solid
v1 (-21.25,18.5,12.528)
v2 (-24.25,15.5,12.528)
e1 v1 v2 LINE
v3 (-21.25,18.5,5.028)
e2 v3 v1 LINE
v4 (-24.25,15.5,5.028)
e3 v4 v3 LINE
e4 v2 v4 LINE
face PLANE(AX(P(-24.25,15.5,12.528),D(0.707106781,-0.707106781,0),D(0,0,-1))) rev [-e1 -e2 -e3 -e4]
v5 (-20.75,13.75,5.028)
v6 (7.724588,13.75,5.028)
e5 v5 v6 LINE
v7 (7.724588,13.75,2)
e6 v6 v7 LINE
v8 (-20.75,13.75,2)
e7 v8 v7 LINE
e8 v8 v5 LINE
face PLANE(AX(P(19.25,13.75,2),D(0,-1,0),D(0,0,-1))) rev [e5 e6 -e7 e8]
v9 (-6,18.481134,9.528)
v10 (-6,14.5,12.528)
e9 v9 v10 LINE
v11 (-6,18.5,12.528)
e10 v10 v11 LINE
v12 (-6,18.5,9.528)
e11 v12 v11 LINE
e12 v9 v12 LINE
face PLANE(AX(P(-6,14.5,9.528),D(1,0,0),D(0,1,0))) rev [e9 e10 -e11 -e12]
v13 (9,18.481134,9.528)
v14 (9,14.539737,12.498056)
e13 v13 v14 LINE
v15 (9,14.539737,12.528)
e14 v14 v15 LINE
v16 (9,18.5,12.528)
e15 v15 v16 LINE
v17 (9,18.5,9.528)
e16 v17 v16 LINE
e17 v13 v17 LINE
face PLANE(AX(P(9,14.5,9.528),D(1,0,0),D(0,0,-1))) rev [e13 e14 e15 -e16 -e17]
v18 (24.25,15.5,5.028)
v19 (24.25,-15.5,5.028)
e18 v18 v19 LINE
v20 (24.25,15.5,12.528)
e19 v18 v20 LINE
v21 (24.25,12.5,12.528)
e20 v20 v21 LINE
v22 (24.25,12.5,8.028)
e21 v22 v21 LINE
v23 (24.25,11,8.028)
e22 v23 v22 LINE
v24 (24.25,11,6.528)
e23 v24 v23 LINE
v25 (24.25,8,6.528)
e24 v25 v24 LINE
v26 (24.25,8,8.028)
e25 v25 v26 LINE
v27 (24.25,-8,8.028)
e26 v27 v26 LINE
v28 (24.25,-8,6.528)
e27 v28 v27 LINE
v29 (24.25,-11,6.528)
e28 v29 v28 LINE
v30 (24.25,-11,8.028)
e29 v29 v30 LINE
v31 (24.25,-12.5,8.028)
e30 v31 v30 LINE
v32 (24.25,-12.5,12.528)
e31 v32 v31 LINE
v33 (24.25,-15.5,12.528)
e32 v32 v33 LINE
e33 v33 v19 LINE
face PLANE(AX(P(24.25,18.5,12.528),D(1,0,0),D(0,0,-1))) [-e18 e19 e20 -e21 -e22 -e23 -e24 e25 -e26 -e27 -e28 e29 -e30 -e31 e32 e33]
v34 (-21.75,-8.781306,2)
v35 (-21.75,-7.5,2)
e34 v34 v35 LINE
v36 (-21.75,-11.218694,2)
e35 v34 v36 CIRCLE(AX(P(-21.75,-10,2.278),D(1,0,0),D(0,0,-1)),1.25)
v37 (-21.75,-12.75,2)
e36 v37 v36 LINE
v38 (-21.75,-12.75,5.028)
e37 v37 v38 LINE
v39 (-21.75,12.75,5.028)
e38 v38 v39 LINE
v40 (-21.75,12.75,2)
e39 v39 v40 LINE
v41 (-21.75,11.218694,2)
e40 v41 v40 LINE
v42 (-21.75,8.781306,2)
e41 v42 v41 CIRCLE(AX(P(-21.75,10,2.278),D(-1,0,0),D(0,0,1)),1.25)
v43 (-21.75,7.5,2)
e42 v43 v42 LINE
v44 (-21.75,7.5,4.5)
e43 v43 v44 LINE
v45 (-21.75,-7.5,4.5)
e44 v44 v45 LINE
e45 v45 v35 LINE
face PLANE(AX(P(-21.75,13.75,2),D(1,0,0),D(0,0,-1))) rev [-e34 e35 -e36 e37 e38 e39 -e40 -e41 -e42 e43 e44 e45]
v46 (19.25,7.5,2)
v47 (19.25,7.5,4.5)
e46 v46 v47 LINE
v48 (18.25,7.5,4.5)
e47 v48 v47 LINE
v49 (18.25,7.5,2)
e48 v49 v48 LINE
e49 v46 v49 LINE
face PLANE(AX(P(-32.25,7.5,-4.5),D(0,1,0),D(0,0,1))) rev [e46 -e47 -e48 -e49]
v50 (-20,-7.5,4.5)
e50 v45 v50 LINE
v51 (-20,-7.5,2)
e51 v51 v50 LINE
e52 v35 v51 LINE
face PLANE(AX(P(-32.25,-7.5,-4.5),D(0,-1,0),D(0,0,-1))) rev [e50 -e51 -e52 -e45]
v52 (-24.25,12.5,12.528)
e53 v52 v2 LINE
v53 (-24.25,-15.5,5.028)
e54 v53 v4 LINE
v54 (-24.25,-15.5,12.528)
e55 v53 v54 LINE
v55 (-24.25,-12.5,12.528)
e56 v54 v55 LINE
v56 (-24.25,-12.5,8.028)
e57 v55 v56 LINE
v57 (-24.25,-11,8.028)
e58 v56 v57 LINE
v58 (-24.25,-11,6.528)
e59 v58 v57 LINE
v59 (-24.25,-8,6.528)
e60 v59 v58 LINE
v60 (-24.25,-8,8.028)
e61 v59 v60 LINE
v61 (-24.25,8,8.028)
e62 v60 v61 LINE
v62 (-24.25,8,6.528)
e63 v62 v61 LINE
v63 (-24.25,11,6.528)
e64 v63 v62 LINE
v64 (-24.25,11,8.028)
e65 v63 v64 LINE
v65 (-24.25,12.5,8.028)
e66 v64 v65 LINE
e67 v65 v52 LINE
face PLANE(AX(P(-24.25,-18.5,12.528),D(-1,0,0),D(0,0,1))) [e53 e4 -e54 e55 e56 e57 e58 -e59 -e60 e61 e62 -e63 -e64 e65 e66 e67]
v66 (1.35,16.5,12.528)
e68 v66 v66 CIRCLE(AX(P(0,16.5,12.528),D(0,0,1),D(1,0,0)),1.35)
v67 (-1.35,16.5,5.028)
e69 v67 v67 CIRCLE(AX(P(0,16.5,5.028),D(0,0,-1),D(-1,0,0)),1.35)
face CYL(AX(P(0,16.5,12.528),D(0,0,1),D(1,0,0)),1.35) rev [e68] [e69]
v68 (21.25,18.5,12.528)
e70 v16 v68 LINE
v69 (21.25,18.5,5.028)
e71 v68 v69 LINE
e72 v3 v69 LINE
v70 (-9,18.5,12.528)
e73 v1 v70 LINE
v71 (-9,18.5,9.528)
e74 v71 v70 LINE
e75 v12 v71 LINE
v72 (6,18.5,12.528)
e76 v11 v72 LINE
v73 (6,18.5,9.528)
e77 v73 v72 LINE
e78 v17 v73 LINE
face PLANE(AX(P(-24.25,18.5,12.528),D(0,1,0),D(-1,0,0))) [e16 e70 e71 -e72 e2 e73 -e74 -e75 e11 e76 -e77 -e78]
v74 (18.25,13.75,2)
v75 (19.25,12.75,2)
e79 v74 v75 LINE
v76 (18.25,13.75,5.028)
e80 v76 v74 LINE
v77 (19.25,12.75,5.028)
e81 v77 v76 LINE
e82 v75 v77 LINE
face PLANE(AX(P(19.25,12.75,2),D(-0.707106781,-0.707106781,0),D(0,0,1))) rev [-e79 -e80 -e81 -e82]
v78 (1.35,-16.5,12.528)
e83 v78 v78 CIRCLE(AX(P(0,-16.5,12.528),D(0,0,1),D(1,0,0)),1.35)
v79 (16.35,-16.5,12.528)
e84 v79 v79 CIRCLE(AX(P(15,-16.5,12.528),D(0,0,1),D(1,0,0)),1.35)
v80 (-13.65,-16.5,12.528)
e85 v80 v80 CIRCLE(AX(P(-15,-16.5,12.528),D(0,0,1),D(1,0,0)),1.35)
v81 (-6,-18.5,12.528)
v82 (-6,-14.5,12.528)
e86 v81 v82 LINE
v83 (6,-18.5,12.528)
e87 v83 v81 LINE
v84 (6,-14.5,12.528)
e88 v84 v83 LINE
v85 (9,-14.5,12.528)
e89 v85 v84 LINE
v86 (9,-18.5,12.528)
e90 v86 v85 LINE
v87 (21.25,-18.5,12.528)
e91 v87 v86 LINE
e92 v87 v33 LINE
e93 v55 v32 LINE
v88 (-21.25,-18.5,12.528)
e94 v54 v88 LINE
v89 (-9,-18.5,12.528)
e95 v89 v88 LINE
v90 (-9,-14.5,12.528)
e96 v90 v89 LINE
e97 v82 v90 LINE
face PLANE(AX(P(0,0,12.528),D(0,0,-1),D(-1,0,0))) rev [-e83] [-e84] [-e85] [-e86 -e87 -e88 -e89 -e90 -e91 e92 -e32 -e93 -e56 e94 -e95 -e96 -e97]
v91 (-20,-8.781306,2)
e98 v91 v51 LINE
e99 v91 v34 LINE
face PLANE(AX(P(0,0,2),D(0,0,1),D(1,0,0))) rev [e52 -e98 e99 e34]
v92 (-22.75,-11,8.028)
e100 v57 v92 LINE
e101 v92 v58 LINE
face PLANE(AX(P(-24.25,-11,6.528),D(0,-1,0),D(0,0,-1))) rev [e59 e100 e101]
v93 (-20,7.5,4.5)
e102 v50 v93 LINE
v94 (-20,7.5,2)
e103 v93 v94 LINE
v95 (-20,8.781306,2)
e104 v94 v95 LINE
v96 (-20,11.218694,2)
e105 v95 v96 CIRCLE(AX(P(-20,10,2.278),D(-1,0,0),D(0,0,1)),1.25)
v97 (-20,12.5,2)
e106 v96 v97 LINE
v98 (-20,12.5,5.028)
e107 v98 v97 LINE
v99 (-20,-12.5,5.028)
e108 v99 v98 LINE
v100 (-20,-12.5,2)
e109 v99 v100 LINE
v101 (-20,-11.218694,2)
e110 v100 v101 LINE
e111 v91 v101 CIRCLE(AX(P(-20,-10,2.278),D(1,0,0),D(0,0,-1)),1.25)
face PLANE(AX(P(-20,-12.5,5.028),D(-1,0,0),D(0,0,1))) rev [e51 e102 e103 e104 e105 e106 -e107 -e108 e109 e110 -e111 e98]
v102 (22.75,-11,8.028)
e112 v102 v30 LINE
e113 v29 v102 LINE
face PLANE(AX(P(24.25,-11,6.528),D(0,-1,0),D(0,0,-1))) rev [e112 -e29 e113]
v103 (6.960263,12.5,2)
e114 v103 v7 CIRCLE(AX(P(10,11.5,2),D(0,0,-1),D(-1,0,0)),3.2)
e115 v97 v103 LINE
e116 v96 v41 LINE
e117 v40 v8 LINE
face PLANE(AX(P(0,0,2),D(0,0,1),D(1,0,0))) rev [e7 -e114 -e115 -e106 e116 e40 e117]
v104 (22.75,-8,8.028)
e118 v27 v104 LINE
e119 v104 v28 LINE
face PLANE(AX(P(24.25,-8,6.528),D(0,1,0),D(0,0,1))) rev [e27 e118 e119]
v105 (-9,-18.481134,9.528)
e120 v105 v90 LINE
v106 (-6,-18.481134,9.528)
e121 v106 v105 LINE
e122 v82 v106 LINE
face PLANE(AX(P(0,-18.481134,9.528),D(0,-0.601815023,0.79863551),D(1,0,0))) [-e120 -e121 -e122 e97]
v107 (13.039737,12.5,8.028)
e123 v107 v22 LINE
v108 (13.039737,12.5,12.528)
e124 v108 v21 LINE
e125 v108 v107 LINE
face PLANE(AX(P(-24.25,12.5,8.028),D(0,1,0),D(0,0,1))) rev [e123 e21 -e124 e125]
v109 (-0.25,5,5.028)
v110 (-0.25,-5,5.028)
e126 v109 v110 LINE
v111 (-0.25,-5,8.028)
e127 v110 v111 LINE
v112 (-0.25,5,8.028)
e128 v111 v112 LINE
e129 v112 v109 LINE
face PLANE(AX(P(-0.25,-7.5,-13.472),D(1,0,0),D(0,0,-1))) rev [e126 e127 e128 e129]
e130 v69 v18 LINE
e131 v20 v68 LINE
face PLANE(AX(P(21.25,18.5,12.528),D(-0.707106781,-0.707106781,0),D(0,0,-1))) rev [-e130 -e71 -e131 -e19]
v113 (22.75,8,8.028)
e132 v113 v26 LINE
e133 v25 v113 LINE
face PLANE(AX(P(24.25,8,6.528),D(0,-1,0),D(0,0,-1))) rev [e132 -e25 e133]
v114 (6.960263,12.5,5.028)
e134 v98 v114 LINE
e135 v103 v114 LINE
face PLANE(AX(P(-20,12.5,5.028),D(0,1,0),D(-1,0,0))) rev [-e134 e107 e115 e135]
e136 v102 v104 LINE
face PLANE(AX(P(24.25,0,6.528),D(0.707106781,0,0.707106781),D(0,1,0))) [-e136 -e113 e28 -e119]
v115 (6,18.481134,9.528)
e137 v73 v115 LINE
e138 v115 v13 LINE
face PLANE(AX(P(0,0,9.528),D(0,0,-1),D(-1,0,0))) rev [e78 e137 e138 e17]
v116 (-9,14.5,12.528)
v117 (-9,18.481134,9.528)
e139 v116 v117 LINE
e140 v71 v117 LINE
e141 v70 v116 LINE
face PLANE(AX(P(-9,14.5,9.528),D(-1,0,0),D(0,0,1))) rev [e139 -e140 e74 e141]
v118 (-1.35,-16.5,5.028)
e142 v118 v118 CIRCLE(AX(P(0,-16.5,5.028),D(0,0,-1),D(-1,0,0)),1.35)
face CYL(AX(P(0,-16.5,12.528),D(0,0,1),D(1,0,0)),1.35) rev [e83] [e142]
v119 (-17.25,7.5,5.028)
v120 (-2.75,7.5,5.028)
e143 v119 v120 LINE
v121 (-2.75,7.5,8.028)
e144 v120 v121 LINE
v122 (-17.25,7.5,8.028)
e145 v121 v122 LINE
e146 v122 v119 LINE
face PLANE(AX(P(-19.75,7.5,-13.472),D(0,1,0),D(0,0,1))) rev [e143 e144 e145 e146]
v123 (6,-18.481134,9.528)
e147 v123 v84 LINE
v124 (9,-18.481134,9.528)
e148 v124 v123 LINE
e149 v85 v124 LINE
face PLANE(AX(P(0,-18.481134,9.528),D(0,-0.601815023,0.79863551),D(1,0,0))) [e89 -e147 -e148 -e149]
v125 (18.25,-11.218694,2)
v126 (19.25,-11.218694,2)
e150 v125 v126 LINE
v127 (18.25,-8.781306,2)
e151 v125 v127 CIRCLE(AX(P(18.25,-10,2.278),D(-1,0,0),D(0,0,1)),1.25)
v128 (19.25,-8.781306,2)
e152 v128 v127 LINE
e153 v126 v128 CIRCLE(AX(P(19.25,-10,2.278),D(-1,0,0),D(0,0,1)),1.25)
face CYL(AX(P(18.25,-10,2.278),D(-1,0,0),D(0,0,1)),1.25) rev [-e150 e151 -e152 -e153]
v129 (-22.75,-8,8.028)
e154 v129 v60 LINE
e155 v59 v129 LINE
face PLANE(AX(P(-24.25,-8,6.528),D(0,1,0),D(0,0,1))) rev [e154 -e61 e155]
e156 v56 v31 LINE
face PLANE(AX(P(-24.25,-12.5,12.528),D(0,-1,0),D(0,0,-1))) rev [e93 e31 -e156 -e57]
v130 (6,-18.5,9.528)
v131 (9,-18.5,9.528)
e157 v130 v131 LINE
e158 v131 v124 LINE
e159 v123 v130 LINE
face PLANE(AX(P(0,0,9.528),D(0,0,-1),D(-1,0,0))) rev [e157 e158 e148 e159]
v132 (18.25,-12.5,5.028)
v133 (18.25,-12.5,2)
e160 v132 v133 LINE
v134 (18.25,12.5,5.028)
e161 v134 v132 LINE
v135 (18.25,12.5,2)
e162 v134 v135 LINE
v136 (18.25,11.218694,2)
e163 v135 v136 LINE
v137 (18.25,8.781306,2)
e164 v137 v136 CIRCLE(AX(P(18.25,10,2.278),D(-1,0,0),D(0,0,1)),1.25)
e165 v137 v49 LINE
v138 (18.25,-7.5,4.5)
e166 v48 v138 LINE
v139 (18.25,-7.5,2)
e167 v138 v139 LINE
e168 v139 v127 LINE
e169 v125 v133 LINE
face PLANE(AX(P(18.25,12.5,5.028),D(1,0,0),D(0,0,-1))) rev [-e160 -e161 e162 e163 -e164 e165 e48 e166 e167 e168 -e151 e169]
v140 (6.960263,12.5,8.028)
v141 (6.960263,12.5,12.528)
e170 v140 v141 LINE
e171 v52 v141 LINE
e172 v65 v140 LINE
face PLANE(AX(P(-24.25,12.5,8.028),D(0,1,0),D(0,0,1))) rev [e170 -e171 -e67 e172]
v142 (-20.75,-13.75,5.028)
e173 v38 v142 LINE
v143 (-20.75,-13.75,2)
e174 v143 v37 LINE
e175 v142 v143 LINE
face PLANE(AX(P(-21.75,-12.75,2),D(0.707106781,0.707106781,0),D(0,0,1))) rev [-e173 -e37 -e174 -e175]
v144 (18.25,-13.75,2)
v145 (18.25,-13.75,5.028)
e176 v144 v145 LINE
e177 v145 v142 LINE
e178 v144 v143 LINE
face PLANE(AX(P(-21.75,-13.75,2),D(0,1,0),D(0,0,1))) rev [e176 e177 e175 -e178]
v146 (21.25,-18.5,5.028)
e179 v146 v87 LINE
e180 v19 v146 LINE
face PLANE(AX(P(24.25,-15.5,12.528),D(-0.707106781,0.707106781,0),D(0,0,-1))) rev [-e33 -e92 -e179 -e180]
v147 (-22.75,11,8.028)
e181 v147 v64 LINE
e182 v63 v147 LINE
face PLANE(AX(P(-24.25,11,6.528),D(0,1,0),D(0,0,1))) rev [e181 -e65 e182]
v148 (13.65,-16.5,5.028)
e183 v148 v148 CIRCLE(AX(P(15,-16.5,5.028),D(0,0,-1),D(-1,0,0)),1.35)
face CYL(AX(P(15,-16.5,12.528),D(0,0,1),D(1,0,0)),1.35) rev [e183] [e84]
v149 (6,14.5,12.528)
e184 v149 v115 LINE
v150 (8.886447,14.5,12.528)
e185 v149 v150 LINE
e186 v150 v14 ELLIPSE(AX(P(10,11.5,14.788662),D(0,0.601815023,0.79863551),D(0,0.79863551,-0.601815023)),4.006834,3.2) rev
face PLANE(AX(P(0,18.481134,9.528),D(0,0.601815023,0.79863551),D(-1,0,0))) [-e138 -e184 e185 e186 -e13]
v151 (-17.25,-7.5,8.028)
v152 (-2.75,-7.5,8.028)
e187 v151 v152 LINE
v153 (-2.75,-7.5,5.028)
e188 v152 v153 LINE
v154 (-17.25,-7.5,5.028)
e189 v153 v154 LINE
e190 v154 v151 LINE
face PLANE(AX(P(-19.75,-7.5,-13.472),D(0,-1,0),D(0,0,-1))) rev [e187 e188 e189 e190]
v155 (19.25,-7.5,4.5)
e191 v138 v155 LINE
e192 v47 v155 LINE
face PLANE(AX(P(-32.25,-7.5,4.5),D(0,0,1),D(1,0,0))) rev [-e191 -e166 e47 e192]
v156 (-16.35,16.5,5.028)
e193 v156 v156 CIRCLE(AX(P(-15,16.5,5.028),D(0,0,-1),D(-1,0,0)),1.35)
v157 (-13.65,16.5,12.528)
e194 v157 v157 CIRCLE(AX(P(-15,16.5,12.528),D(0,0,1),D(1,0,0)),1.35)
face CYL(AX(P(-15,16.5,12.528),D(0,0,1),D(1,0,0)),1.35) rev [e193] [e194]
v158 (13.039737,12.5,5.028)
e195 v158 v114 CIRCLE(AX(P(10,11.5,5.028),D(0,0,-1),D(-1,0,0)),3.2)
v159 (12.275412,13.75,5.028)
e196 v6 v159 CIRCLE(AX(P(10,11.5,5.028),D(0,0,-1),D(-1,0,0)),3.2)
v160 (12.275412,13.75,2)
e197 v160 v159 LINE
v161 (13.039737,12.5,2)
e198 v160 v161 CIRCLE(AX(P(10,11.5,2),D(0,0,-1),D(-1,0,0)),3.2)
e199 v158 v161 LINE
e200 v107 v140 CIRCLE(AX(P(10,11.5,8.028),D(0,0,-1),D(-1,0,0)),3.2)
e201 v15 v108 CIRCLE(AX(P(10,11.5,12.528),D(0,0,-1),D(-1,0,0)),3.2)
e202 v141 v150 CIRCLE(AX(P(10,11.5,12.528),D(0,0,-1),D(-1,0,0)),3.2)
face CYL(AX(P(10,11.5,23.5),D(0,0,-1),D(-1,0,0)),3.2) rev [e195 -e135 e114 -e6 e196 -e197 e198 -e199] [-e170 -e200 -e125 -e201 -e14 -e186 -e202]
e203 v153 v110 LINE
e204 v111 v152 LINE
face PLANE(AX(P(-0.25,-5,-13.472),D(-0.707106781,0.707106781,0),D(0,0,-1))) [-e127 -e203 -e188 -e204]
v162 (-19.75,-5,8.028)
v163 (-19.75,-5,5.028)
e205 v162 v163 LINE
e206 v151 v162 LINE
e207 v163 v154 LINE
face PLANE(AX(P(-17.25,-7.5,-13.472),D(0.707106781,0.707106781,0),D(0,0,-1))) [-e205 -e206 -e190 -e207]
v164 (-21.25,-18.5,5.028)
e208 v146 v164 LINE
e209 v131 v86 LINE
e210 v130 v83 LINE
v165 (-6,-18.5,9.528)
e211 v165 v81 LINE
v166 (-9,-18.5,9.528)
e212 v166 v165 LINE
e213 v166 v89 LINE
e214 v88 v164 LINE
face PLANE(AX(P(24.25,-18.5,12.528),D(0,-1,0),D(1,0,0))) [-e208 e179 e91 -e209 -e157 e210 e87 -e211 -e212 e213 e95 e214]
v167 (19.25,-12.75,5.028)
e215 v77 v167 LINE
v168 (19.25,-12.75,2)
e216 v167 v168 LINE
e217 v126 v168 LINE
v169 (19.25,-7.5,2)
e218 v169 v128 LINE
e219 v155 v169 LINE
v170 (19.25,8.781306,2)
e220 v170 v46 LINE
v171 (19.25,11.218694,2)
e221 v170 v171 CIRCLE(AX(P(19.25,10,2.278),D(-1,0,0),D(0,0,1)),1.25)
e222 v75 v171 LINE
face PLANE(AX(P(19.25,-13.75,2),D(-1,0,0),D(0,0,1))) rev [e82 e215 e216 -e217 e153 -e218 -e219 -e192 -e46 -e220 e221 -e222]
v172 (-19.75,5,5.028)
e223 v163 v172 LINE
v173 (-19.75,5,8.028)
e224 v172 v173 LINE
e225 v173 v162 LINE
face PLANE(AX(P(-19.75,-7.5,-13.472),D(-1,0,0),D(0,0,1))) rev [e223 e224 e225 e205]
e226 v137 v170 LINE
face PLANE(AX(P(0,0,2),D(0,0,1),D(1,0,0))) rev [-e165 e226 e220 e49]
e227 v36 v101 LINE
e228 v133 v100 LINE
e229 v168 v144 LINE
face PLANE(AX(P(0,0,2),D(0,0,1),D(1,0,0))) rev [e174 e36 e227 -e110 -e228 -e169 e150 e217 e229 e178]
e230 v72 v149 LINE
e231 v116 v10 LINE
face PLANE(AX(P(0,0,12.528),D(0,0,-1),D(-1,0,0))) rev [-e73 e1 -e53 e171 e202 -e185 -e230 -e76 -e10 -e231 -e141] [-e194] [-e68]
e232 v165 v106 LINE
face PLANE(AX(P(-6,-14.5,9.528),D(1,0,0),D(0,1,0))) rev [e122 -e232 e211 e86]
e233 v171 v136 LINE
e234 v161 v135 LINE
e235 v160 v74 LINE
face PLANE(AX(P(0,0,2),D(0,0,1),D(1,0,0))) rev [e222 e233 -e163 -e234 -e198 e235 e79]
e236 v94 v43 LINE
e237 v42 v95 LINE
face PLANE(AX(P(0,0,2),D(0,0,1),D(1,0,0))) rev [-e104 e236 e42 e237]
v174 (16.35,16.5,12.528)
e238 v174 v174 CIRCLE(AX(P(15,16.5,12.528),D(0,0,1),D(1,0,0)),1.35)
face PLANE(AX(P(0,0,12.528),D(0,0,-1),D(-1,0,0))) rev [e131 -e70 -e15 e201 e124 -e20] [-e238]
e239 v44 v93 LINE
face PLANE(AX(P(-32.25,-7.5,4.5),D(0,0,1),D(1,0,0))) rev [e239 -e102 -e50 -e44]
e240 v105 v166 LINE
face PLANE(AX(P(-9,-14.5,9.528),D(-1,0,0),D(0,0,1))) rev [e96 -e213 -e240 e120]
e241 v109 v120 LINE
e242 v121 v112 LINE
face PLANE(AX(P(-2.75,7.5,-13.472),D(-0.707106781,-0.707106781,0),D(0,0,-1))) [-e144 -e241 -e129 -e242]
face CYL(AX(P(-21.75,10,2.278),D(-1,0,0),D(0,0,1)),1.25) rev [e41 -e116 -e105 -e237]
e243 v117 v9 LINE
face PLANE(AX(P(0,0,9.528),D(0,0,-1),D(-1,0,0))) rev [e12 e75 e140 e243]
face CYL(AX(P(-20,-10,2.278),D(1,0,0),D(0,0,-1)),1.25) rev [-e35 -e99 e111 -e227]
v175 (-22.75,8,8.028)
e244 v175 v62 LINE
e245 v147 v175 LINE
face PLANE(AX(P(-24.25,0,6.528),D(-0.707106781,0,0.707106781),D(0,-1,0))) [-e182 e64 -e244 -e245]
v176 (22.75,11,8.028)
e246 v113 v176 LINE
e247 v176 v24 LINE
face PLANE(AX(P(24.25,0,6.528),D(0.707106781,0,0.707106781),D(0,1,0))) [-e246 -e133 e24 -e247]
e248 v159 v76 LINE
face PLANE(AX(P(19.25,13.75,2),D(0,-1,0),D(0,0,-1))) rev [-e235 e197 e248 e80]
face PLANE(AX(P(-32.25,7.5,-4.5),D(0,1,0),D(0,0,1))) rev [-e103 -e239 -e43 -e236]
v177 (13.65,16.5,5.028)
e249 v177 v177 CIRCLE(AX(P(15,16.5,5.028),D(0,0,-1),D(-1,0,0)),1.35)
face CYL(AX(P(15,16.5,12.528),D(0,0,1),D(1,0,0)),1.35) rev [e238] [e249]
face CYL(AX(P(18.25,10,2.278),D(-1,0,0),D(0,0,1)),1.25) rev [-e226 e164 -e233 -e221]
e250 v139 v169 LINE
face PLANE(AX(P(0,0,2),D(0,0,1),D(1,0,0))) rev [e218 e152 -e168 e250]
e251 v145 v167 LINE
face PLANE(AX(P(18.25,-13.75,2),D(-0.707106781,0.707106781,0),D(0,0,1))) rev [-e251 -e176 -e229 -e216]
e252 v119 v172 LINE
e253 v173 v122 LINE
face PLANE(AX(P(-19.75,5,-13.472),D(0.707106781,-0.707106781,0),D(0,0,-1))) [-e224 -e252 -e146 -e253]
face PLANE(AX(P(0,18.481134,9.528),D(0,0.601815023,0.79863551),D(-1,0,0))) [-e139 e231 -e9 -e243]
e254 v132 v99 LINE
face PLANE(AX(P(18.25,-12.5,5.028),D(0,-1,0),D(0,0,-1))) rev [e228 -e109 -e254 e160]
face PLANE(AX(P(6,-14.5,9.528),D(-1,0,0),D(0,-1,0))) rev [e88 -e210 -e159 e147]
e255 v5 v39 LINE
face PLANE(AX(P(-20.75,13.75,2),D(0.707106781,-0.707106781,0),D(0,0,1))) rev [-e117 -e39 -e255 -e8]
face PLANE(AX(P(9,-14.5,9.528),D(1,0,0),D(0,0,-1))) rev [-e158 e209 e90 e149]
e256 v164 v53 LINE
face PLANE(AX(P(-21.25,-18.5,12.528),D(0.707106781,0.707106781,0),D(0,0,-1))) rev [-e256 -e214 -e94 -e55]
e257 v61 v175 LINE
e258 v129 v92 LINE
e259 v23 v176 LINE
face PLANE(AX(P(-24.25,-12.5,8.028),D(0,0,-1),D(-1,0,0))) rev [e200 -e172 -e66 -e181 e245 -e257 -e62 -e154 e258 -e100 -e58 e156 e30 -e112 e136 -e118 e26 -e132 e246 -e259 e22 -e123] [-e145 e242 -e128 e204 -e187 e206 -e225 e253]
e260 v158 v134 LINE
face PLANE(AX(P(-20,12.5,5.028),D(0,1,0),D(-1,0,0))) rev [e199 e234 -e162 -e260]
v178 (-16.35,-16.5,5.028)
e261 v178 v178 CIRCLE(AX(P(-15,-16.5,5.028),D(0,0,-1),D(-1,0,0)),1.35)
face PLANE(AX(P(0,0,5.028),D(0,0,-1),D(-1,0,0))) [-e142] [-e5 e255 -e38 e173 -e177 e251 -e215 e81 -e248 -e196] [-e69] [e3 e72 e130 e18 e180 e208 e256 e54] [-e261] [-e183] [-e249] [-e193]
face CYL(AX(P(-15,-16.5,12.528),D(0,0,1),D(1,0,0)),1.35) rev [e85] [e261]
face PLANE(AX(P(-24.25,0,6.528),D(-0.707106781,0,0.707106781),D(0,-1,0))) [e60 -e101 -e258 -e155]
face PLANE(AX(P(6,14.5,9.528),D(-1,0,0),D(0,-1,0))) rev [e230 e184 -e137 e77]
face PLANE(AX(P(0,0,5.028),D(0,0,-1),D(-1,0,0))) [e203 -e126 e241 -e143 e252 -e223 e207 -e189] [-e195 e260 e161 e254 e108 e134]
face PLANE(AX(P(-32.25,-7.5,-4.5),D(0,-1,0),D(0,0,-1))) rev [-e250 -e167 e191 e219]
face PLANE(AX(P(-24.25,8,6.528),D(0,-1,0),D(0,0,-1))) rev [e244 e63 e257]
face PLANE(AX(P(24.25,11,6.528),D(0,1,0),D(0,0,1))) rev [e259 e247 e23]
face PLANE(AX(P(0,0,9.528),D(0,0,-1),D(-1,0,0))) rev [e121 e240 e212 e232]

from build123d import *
from OCP.BRepFilletAPI import BRepFilletAPI_MakeChamfer

# Parameters (mm, degrees)
SKETCH_1_W                  = 48.5
SKETCH_1_H                  = 37
EXTRUDE_1_DEPTH             = 7.5
SKETCH_2_W                  = 4.5
SKETCH_2_H                  = 25
CUT_EXTRUDE_1_DEPTH         = 54.398977368
SKETCH_3_W                  = 41
SKETCH_3_H                  = 27.5
EXTRUDE_2_DEPTH             = 3.028
SKETCH_4_W                  = 38.25
SKETCH_4_H                  = 25
CUT_EXTRUDE_2_DEPTH         = 3.028
CUT_EXTRUDE_3_DEPTH         = 49.015109955
CUT_EXTRUDE_4_DEPTH         = 52.139033859
CUT_EXTRUDE_5_DEPTH         = 32.090983966
HOLE_WIZARD_2_5_2_5_1_D     = 2.5
HOLE_WIZARD_2_5_2_5_1_DEPTH = 1.75
HOLE_WIZARD_2_5_2_5_2_D     = 2.5
HOLE_WIZARD_2_5_2_5_2_DEPTH = 6
HOLE_WIZARD_2_5_2_5_3_D     = 2.5
HOLE_WIZARD_2_5_2_5_3_DEPTH = 4.25
HOLE_WIZARD_2_7_2_7_1_D     = 2.7
CHAMFER_1_SIZE              = 3
SKETCH_17_W                 = 3
SKETCH_17_H                 = 4
CUT_EXTRUDE_8_DEPTH         = 3
CHAMFER_2_SIZE              = 3
CHAMFER_2_SIZE_2            = 3.981134465
SKETCH_19_W                 = 2
SKETCH_19_H                 = 3
CUT_EXTRUDE_9_DEPTH         = 1.5
CHAMFER_3_SIZE              = 2
CHAMFER_4_SIZE              = 1
SKETCH_20_R                 = 3.2
CUT_EXTRUDE_10_DEPTH        = 21.5
SKETCH_21_W                 = 19.5
SKETCH_21_H                 = 15
CUT_EXTRUDE_11_DEPTH        = 21.5
CHAMFER_5_SIZE              = 2.5
SKETCH_22_W                 = 9
SKETCH_22_H                 = 15
CUT_EXTRUDE_12_DEPTH        = 51.5


# Some blends are built 0.0001 mm under size
with BuildPart() as part:
    # 草图1 → 凸台-拉伸1 (new body)
    with BuildSketch(Plane(origin=(0, 0, 5.028), x_dir=(-1, 0, 0), z_dir=(0, 0, -1))):
        Rectangle(SKETCH_1_W, SKETCH_1_H)
    extrude(amount=-EXTRUDE_1_DEPTH)

    # 草图2 → 切除-拉伸1 (cut, through all)
    with BuildSketch(Plane(origin=(24.25, 0, 0), x_dir=(0, 0, -1), z_dir=(1, 0, 0))):
        with Locations((-10.278, 0)):
            Rectangle(SKETCH_2_W, SKETCH_2_H)
    extrude(amount=-CUT_EXTRUDE_1_DEPTH, mode=Mode.SUBTRACT)

    # 草图3 → 凸台-拉伸2 (add)
    with BuildSketch(Plane(origin=(0, 0, 5.028), x_dir=(-1, 0, 0), z_dir=(0, 0, -1))):
        with Locations((1.25, 0)):
            Rectangle(SKETCH_3_W, SKETCH_3_H)
    extrude(amount=EXTRUDE_2_DEPTH)

    # 草图4 → 切除-拉伸2 (cut)
    with BuildSketch(Plane(origin=(0, 0, 2), x_dir=(-1, 0, 0), z_dir=(0, 0, -1))):
        with Locations((0.875, 0)):
            Rectangle(SKETCH_4_W, SKETCH_4_H)
    extrude(amount=-CUT_EXTRUDE_2_DEPTH, mode=Mode.SUBTRACT)

    # 草图5 → 切除-拉伸3 (cut, through all)
    with BuildSketch(Plane.ZY.offset(-18.25)):
        with BuildLine():
            Line((2, 7.034395212), (2, -7.034395212))
            ThreePointArc((2, -7.034395212), (4.278, 0), (2, 7.034395212))
        make_face()
    extrude(amount=-CUT_EXTRUDE_3_DEPTH, mode=Mode.SUBTRACT)

    # 草图6 → 切除-拉伸4 (cut, through all)
    with BuildSketch(Plane.ZY.offset(21.75)):
        with BuildLine():
            Line((2, 7.034395212), (2, -7.034395212))
            ThreePointArc((2, -7.034395212), (4.278, 0), (2, 7.034395212))
        make_face()
    extrude(amount=-CUT_EXTRUDE_4_DEPTH, mode=Mode.SUBTRACT)

    # 草图7 → 切除-拉伸5 (cut, through all)
    with BuildSketch(Plane.XY.offset(8.028)):
        with BuildLine():
            Line((-7.978419869, 7.029222073), (-13.021580131, 7.029222073))
            ThreePointArc((-13.021580131, 7.029222073), (-17.801221513, 4.934335949), (-19.5, 0))
            ThreePointArc((-19.5, 0), (-17.801221513, -4.934335949), (-13.021580131, -7.029222073))
            Line((-13.021580131, -7.029222073), (-7.978419869, -7.029222073))
            ThreePointArc((-7.978419869, -7.029222073), (-3.198778487, -4.934335949), (-1.5, 0))
            ThreePointArc((-1.5, 0), (-3.198778487, 4.934335949), (-7.978419869, 7.029222073))
        make_face()
    extrude(amount=-CUT_EXTRUDE_5_DEPTH, mode=Mode.SUBTRACT)

    # Ø2.5 (2.5) 直径孔1
    with Locations(Plane.ZY.offset(21.75)):
        with Locations((2.278, 10)):
            Hole(HOLE_WIZARD_2_5_2_5_1_D / 2, depth=HOLE_WIZARD_2_5_2_5_1_DEPTH)

    # Ø2.5 (2.5) 直径孔2
    with Locations(Plane.ZY.offset(-18.25)):
        with Locations((2.278, -10), (2.278, 10)):
            Hole(HOLE_WIZARD_2_5_2_5_2_D / 2, depth=HOLE_WIZARD_2_5_2_5_2_DEPTH)

    # Ø2.5 (2.5) 直径孔3
    with Locations(Plane(origin=(-20, 0, 0), x_dir=(0, 0, -1), z_dir=(1, 0, 0))):
        with Locations((-2.278, -10)):
            Hole(HOLE_WIZARD_2_5_2_5_3_D / 2, depth=HOLE_WIZARD_2_5_2_5_3_DEPTH)

    # Ø2.7 (2.7) 直径孔1 (through all)
    with Locations(Plane.XY.offset(12.528)):
        with Locations((0, -16.5), (-15, -16.5), (15, -16.5), (0, 16.5), (-15, 16.5), (15, 16.5)):
            Hole(HOLE_WIZARD_2_7_2_7_1_D / 2)

    # 倒角1
    chamfer_1_edges = [part.edges().sort_by_distance(p)[0] for p in [
        (-24.25, 18.5, 8.778),
        (-24.25, -18.5, 8.778),
        (24.25, -18.5, 8.778),
        (24.25, 18.5, 8.778),
    ]]
    chamfer(chamfer_1_edges, length=CHAMFER_1_SIZE)

    # 草图17 → 切除-拉伸8 (cut)
    with BuildSketch(Plane.XY.offset(12.528)):
        with Locations((-7.5, -16.5)):
            Rectangle(SKETCH_17_W, SKETCH_17_H)
        with Locations((7.5, -16.5)):
            Rectangle(SKETCH_17_W, SKETCH_17_H)
        with Locations((7.5, 16.5)):
            Rectangle(SKETCH_17_W, SKETCH_17_H)
        with Locations((-7.5, 16.5)):
            Rectangle(SKETCH_17_W, SKETCH_17_H)
    extrude(amount=-CUT_EXTRUDE_8_DEPTH, mode=Mode.SUBTRACT)

    # 倒角2
    chamfer_2_edges_1 = [part.edges().sort_by_distance(p)[0] for p in [
        (7.5, -14.5, 9.528),
    ]]
    chamfer_2_side_1 = [part.faces().sort_by_distance(p)[0] for p in [
        (7.5, -14.5, 9.588),
    ]]
    chamfer_2_edges_2 = [part.edges().sort_by_distance(p)[0] for p in [
        (-7.5, -14.5, 9.528),
    ]]
    chamfer_2_side_2 = [part.faces().sort_by_distance(p)[0] for p in [
        (-7.5, -14.5, 9.588),
    ]]
    chamfer_2_edges_3 = [part.edges().sort_by_distance(p)[0] for p in [
        (-7.5, 14.5, 9.528),
    ]]
    chamfer_2_side_3 = [part.faces().sort_by_distance(p)[0] for p in [
        (-7.5, 14.5, 9.588),
    ]]
    chamfer_2_edges_4 = [part.edges().sort_by_distance(p)[0] for p in [
        (7.5, 14.5, 9.528),
    ]]
    chamfer_2_side_4 = [part.faces().sort_by_distance(p)[0] for p in [
        (7.5, 14.5, 9.588),
    ]]
    chamfer_2 = BRepFilletAPI_MakeChamfer(part.part.solid().wrapped)
    for e in chamfer_2_edges_1:
        chamfer_2.Add(CHAMFER_2_SIZE - 0.0001, CHAMFER_2_SIZE_2 - 0.0001, e.wrapped, chamfer_2_side_1[0].wrapped)
    for e in chamfer_2_edges_2:
        chamfer_2.Add(CHAMFER_2_SIZE - 0.0001, CHAMFER_2_SIZE_2 - 0.0001, e.wrapped, chamfer_2_side_2[0].wrapped)
    for e in chamfer_2_edges_3:
        chamfer_2.Add(CHAMFER_2_SIZE - 0.0001, CHAMFER_2_SIZE_2 - 0.0001, e.wrapped, chamfer_2_side_3[0].wrapped)
    for e in chamfer_2_edges_4:
        chamfer_2.Add(CHAMFER_2_SIZE - 0.0001, CHAMFER_2_SIZE_2 - 0.0001, e.wrapped, chamfer_2_side_4[0].wrapped)
    add(Compound.cast(chamfer_2.Shape()), mode=Mode.REPLACE)  # a hair under: the kernel refuses the full size

    # 草图19 → 切除-拉伸9 (cut)
    with BuildSketch(Plane.XY.offset(8.028)):
        with Locations((-23.25, -9.5)):
            Rectangle(SKETCH_19_W, SKETCH_19_H)
        with Locations((-23.25, 9.5)):
            Rectangle(SKETCH_19_W, SKETCH_19_H)
        with Locations((23.25, 9.5)):
            Rectangle(SKETCH_19_W, SKETCH_19_H)
        with Locations((23.25, -9.5)):
            Rectangle(SKETCH_19_W, SKETCH_19_H)
    extrude(amount=-CUT_EXTRUDE_9_DEPTH, mode=Mode.SUBTRACT)

    # 倒角3
    # the kernel refuses this chamfer: 2 mm, written as the material it adds along each edge
    with BuildSketch(Plane(origin=(22.25, 11, 6.528), x_dir=(0.9996219169112968, 0, -0.02749587661058651), z_dir=(0, -1, 0))) as chamfer_3_piece_1_section:
        Polygon((CHAMFER_3_SIZE * 0.999621916911, CHAMFER_3_SIZE * 0.0274958766106), (-CHAMFER_3_SIZE * 0.0274958766106, CHAMFER_3_SIZE * 0.999621916911), (0, 0), align=None)
    chamfer_3_piece_1 = extrude(amount=8.143365976, mode=Mode.PRIVATE)
    chamfer_3_piece_1 = split(chamfer_3_piece_1, bisect_by=Plane(origin=(22.95, 9.5, 8.028), z_dir=(0, 0, -1)), keep=Keep.TOP, mode=Mode.PRIVATE)
    add(chamfer_3_piece_1)
    with BuildSketch(Plane(origin=(22.25, -11, 6.528), x_dir=(0.9996219169112968, 0, -0.02749587661058651), z_dir=(0, 1, 0))) as chamfer_3_piece_2_section:
        Polygon((CHAMFER_3_SIZE * 0.999621916911, -CHAMFER_3_SIZE * 0.0274958766106), (-CHAMFER_3_SIZE * 0.0274958766106, -CHAMFER_3_SIZE * 0.999621916911), (0, 0), align=None)
    chamfer_3_piece_2 = extrude(amount=8.143365976, mode=Mode.PRIVATE)
    chamfer_3_piece_2 = split(chamfer_3_piece_2, bisect_by=Plane(origin=(22.95, -9.5, 8.028), z_dir=(0, 0, -1)), keep=Keep.TOP, mode=Mode.PRIVATE)
    add(chamfer_3_piece_2)
    with BuildSketch(Plane(origin=(-22.25, 11, 6.528), x_dir=(-0.9996219169112968, 0, -0.02749587661058651), z_dir=(0, -1, 0))) as chamfer_3_piece_3_section:
        Polygon((CHAMFER_3_SIZE * 0.999621916911, -CHAMFER_3_SIZE * 0.0274958766106), (-CHAMFER_3_SIZE * 0.0274958766106, -CHAMFER_3_SIZE * 0.999621916911), (0, 0), align=None)
    chamfer_3_piece_3 = extrude(amount=8.143365976, mode=Mode.PRIVATE)
    chamfer_3_piece_3 = split(chamfer_3_piece_3, bisect_by=Plane(origin=(-22.95, 9.5, 8.028), z_dir=(0, 0, -1)), keep=Keep.TOP, mode=Mode.PRIVATE)
    add(chamfer_3_piece_3)
    with BuildSketch(Plane(origin=(-22.25, -16.143365976, 6.528), x_dir=(-0.9996219169112968, 0, -0.02749587661058651), z_dir=(0, 1, 0))) as chamfer_3_piece_4_section:
        Polygon((CHAMFER_3_SIZE * 0.999621916911, CHAMFER_3_SIZE * 0.0274958766106), (-CHAMFER_3_SIZE * 0.0274958766106, CHAMFER_3_SIZE * 0.999621916911), (0, 0), align=None)
    chamfer_3_piece_4 = extrude(amount=13.286731952, mode=Mode.PRIVATE)
    chamfer_3_piece_4 = split(chamfer_3_piece_4, bisect_by=Plane(origin=(-22.95, -9.5, 8.028), z_dir=(0, 0, -1)), keep=Keep.TOP, mode=Mode.PRIVATE)
    chamfer_3_piece_4 = split(chamfer_3_piece_4, bisect_by=Plane(origin=(-26.6, -13.15, 7.128), z_dir=(0.7071067811865476, 0.7071067811865476, 0)), keep=Keep.TOP, mode=Mode.PRIVATE)
    add(chamfer_3_piece_4)

    # 倒角4
    chamfer_4_edges = [part.edges().sort_by_distance(p)[0] for p in [
        (-21.75, 13.75, 3.514),
        (19.25, 13.75, 3.514),
        (19.25, -13.75, 3.514),
        (-21.75, -13.75, 3.514),
    ]]
    chamfer(chamfer_4_edges, length=CHAMFER_4_SIZE)

    # 草图20 → 切除-拉伸10 (cut)
    with BuildSketch(Plane(origin=(0, 0, 2), x_dir=(-1, 0, 0), z_dir=(0, 0, -1))):
        with Locations(Location((-10, 11.5, 0), (0, 0, 18.209956864))):
            Circle(SKETCH_20_R)
    extrude(amount=-CUT_EXTRUDE_10_DEPTH, mode=Mode.SUBTRACT)

    # 草图21 → 切除-拉伸11 (cut)
    with BuildSketch(Plane.XY.offset(8.028)):
        with Locations((-10, 0)):
            Rectangle(SKETCH_21_W, SKETCH_21_H)
    extrude(amount=-CUT_EXTRUDE_11_DEPTH, mode=Mode.SUBTRACT)

    # 倒角5
    chamfer_5_edges = [part.edges().sort_by_distance(p)[0] for p in [
        (-0.25, 7.5, 6.528),
        (-0.25, -7.5, 6.528),
        (-19.75, -7.5, 6.528),
        (-19.75, 7.5, 6.528),
    ]]
    chamfer(chamfer_5_edges, length=CHAMFER_5_SIZE)

    # 草图22 → 切除-拉伸12 (cut)
    with BuildSketch(Plane(origin=(19.25, 0, 0), x_dir=(0, 0, -1), z_dir=(1, 0, 0))):
        Rectangle(SKETCH_22_W, SKETCH_22_H)
    extrude(amount=-CUT_EXTRUDE_12_DEPTH, mode=Mode.SUBTRACT)


solid = part.part
